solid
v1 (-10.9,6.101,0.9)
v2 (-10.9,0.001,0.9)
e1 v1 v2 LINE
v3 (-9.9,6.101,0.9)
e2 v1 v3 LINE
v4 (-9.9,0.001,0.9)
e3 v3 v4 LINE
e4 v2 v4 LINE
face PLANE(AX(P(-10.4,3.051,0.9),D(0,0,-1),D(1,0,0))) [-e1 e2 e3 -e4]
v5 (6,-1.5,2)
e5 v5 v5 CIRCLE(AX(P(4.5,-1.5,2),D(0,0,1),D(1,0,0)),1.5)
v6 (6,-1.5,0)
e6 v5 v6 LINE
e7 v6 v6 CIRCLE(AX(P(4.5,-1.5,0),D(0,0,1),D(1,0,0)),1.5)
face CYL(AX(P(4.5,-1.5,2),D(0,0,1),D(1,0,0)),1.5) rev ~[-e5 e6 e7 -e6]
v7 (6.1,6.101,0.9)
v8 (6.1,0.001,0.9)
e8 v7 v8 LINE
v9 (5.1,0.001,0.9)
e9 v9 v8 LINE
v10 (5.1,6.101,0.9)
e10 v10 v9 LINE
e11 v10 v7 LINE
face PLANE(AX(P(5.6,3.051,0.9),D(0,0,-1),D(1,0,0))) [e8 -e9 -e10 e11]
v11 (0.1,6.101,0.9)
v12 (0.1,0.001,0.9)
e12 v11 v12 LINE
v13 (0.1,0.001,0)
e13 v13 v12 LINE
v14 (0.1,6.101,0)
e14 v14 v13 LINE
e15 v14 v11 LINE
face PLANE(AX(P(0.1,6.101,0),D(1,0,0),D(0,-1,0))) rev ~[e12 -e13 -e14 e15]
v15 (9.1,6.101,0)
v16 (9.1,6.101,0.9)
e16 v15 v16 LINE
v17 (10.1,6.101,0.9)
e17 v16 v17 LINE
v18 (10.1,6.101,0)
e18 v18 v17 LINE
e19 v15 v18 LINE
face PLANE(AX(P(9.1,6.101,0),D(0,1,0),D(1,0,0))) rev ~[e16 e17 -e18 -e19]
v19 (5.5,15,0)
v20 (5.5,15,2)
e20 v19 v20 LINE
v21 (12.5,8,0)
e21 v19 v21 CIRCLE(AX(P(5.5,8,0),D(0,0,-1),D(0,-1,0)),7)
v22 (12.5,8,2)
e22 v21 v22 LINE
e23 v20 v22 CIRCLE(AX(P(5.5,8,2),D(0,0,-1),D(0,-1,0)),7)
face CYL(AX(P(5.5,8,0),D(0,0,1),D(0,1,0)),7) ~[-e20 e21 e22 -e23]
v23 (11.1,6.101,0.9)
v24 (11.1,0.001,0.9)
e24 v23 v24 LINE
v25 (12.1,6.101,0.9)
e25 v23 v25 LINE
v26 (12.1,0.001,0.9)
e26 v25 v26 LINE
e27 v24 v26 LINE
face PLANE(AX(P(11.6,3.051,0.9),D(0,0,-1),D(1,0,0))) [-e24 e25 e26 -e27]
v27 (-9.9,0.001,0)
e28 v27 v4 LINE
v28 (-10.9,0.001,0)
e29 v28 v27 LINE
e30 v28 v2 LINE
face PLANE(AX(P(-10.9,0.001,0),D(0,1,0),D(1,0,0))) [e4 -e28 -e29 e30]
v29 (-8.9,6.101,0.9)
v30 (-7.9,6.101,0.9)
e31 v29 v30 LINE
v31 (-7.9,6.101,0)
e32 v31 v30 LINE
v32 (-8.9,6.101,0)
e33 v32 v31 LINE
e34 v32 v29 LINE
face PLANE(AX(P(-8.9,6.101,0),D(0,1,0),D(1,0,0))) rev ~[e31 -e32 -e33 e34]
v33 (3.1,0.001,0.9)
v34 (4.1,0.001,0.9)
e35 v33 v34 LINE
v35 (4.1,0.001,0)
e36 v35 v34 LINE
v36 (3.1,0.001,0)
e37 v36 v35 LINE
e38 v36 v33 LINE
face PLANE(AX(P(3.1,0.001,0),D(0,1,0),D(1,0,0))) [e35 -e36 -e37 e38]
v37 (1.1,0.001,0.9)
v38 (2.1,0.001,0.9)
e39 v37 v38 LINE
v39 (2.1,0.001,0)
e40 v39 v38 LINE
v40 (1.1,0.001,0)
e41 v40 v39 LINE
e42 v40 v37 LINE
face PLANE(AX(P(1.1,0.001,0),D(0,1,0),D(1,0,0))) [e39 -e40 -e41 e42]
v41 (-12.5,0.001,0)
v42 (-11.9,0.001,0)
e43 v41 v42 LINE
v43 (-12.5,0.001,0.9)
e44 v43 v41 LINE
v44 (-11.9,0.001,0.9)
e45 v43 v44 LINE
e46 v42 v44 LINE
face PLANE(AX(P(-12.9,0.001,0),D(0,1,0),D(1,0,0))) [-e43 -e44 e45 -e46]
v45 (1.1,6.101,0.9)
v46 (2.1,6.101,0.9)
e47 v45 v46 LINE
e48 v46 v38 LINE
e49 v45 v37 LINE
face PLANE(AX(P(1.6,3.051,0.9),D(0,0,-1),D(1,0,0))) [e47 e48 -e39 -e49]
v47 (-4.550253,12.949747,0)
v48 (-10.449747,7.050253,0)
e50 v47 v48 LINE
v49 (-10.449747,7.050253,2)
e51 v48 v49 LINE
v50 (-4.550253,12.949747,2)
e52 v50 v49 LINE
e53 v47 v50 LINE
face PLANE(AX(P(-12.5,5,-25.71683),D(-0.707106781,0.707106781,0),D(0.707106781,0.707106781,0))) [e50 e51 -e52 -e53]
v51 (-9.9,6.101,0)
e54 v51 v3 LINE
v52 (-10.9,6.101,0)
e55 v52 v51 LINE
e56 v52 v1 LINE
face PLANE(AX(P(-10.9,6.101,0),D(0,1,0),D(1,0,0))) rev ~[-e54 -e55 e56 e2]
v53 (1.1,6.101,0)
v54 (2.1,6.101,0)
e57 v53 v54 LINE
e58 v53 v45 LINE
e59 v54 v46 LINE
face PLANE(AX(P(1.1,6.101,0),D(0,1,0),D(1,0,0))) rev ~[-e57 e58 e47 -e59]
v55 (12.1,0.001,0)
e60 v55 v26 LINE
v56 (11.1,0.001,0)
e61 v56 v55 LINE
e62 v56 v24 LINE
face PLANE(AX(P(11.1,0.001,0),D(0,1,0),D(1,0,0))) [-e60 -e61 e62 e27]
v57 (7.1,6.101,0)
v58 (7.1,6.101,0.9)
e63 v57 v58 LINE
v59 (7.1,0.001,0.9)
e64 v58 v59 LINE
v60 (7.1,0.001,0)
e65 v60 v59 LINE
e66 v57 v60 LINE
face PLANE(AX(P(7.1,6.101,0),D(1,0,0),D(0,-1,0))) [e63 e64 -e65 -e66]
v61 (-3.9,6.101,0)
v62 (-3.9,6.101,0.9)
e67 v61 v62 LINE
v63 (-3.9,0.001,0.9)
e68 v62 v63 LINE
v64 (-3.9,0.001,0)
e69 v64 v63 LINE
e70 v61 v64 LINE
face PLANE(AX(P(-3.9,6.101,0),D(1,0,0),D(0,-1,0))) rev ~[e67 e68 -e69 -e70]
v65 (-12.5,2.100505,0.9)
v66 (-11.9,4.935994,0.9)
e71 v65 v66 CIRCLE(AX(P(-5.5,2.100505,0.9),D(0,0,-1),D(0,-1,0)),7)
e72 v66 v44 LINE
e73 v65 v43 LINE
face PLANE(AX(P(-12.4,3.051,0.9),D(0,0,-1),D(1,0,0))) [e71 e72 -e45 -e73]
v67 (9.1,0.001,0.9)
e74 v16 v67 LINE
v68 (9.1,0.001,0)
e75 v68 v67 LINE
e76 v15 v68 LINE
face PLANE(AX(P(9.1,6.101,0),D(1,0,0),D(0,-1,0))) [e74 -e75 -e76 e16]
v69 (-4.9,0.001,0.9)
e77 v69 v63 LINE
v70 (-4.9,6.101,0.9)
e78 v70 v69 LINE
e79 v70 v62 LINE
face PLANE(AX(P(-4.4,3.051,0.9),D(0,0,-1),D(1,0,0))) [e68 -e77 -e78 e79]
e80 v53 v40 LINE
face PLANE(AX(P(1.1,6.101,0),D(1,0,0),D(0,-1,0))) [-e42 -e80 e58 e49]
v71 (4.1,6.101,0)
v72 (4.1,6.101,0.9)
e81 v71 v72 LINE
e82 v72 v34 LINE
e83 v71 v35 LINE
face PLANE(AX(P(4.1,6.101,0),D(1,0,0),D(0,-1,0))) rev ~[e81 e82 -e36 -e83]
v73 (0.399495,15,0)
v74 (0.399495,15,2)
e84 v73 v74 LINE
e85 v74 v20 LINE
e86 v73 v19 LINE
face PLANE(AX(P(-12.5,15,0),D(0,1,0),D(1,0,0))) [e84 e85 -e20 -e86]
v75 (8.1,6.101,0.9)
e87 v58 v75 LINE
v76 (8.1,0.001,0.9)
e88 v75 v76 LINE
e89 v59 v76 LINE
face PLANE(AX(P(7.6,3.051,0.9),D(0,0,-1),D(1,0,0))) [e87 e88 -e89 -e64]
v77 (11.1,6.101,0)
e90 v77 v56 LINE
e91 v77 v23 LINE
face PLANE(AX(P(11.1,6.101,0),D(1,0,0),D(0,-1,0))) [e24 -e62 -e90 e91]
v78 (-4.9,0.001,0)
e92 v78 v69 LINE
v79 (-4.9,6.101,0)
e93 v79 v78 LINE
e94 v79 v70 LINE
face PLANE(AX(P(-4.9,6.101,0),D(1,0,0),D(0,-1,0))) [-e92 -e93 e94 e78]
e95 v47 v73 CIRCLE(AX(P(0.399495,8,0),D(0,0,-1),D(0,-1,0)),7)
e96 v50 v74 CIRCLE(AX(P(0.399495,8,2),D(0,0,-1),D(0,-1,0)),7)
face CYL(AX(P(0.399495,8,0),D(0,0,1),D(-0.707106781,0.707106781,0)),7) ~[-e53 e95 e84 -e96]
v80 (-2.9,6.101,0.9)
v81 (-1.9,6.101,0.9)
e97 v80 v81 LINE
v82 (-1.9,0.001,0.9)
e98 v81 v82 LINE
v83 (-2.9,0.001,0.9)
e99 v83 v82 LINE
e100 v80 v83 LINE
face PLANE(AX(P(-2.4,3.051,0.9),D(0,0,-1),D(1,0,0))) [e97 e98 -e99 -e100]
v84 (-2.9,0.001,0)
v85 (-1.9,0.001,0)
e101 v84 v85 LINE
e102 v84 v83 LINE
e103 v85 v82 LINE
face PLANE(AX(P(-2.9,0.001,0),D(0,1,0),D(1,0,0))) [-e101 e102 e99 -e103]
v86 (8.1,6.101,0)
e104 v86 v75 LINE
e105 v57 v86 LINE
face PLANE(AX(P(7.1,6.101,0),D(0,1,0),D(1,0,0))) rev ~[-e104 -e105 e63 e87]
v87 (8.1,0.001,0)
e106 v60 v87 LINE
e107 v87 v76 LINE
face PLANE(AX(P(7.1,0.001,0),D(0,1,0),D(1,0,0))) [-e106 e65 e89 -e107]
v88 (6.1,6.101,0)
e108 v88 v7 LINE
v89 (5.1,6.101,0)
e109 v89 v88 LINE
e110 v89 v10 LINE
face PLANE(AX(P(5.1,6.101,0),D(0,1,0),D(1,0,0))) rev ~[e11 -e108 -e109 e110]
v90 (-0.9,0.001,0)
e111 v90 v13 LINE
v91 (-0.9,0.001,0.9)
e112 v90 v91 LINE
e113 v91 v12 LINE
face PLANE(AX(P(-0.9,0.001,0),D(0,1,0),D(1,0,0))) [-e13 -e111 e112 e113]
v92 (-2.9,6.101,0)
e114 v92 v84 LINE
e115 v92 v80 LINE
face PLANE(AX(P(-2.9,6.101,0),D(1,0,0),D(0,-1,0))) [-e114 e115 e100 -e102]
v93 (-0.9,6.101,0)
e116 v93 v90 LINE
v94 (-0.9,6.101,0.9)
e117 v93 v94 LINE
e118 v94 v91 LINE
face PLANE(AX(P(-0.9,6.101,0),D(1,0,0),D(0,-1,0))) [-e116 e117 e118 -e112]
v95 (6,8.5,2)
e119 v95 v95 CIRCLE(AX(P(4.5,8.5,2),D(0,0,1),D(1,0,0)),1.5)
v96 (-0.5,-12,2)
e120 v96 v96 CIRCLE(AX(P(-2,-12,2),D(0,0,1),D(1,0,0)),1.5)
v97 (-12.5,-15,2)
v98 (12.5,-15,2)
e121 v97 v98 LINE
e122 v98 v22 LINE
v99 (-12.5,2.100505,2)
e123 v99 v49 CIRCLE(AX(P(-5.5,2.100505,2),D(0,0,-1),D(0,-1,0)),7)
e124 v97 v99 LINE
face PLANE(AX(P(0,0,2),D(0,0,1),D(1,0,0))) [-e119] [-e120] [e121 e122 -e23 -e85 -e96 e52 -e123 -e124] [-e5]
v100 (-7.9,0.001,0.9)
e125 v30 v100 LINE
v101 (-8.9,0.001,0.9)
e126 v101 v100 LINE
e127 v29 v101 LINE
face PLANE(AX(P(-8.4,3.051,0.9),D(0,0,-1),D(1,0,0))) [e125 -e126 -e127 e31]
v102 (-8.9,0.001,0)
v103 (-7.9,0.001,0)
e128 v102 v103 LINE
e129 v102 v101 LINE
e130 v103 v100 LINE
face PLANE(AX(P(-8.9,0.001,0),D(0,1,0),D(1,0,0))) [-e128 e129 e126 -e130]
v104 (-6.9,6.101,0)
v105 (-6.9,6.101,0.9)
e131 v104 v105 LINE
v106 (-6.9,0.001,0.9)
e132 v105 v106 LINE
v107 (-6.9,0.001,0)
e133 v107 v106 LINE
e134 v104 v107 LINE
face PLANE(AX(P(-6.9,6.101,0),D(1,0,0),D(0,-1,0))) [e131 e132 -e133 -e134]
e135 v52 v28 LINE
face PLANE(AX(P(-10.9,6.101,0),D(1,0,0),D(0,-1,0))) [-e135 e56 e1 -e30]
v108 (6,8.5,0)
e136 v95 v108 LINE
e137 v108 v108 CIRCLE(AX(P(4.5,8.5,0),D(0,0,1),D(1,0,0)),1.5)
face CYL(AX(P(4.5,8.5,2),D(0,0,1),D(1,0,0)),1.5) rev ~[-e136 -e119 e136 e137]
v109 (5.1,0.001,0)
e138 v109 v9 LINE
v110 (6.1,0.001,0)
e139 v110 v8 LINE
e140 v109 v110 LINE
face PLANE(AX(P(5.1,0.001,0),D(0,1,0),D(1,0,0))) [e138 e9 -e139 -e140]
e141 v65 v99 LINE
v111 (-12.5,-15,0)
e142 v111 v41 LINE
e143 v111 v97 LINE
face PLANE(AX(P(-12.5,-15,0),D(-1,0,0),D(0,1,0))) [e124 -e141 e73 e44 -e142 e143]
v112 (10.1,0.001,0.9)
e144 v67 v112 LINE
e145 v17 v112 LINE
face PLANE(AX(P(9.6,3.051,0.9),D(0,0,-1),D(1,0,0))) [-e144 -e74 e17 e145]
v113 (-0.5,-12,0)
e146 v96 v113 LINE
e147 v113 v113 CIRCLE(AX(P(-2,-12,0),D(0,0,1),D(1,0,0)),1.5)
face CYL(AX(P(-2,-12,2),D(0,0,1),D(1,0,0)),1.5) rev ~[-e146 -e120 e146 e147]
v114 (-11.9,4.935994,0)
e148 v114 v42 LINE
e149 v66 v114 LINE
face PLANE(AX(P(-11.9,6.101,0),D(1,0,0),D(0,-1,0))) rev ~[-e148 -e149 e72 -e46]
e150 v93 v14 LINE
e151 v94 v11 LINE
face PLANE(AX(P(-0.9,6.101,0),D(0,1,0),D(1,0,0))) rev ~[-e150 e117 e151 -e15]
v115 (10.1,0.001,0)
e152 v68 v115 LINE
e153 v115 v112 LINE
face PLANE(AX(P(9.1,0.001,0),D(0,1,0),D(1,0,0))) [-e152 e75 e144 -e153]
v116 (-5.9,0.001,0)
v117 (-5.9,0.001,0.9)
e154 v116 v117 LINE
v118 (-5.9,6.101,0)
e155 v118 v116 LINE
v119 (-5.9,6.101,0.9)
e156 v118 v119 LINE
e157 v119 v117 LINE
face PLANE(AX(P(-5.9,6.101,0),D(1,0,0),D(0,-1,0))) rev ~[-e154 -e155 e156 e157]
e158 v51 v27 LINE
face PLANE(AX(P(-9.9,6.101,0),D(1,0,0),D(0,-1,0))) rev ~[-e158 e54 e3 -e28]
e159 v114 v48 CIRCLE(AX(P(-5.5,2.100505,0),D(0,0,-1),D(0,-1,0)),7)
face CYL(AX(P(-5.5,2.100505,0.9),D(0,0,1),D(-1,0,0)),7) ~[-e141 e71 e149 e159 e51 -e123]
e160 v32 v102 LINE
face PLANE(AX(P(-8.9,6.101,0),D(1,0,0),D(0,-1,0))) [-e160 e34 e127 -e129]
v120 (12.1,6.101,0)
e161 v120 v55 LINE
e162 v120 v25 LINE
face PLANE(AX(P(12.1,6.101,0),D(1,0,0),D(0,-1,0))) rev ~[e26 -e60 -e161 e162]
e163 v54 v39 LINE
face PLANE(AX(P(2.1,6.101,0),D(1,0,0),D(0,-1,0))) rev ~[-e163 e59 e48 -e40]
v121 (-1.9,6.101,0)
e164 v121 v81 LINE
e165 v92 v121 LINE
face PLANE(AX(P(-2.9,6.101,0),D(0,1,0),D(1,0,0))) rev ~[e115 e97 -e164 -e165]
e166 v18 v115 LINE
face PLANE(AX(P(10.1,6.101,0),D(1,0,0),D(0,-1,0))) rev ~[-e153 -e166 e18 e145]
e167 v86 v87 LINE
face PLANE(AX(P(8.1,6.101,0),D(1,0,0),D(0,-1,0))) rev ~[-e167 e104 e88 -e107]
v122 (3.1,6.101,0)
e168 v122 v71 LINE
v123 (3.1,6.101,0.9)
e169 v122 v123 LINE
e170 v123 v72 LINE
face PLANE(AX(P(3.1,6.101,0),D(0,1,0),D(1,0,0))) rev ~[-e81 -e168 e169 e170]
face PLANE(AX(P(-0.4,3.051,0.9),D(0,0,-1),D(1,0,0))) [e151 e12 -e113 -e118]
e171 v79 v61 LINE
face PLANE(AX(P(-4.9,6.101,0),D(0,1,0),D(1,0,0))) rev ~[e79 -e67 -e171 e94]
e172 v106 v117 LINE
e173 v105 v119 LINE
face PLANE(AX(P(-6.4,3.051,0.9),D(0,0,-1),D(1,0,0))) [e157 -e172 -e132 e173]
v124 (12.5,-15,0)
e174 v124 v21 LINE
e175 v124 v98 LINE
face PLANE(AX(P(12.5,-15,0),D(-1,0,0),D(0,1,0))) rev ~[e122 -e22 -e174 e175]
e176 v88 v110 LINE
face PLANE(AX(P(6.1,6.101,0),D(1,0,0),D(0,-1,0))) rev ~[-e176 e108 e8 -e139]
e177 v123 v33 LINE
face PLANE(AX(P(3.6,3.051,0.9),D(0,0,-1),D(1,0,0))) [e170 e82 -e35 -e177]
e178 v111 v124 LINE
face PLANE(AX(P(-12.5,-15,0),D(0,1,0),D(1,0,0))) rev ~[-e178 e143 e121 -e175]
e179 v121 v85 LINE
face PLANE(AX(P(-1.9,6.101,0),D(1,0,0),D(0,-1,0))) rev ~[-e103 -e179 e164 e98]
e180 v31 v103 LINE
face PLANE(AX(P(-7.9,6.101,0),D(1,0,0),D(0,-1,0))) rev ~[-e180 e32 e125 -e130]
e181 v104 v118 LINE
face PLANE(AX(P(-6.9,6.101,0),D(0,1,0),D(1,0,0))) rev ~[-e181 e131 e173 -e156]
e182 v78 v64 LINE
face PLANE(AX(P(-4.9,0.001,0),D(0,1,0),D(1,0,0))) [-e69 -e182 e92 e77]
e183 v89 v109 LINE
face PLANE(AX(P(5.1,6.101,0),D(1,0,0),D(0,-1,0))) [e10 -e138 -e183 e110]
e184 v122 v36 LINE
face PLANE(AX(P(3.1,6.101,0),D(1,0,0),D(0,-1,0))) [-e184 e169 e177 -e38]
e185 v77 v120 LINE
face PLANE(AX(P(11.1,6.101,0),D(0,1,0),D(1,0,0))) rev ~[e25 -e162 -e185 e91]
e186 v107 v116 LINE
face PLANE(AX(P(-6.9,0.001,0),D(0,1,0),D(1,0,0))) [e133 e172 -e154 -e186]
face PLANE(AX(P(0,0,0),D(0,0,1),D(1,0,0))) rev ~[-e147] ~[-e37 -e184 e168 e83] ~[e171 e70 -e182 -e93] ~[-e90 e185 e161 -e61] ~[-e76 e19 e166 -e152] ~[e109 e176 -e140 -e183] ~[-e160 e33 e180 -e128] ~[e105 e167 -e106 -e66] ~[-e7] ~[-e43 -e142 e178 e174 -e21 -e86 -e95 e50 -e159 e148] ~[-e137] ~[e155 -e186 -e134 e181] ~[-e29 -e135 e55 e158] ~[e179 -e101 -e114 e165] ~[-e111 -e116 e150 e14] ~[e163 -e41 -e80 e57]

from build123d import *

# Parameters (mm, degrees)
F0_W        = 25
F0_H        = 30
F1_DEPTH    = 2
F2_R        = 1.5
F3_DEPTH    = 2.001
F4_W        = 1
F4_H        = 6.1
F5_DEPTH    = 0.9
F6_T1_DEPTH = 53.4336597593
F7_R        = 7


# Not quite as in the source:
# - a fillet or chamfer that OpenCascade refuses, or shapes differently, is made with other operations: its cross-section is extruded or revolved along the edge and cut away or added


with BuildPart() as f1:
    # F0 (on Top) → F1 (new body)
    with BuildSketch(Plane.XY):
        Rectangle(F0_W, F0_H)
    extrude(amount=F1_DEPTH)

    # F2 (on face) → F3 (cut, through all)
    with BuildSketch(Plane.XY.offset(2)):
        with Locations((-2, -12)):
            Circle(F2_R)
        with Locations((4.5, -1.5)):
            Circle(F2_R)
        with Locations((4.5, 8.5)):
            Circle(F2_R)
    extrude(amount=-F3_DEPTH, mode=Mode.SUBTRACT)

    # F4 (on face) → F5 (cut)
    with BuildSketch(Plane(origin=(0, 0, 0), x_dir=(1, 0, 0), z_dir=(0, 0, -1))):
        with Locations((11.6, -3.051)):
            Rectangle(F4_W, F4_H)
        with Locations((9.6, -3.051)):
            Rectangle(F4_W, F4_H)
        with Locations((7.6, -3.051)):
            Rectangle(F4_W, F4_H)
        with Locations((5.6, -3.051)):
            Rectangle(F4_W, F4_H)
        with Locations((3.6, -3.051)):
            Rectangle(F4_W, F4_H)
        with Locations((1.6, -3.051)):
            Rectangle(F4_W, F4_H)
        with Locations((-0.4, -3.051)):
            Rectangle(F4_W, F4_H)
        with Locations((-2.4, -3.051)):
            Rectangle(F4_W, F4_H)
        with Locations((-4.4, -3.051)):
            Rectangle(F4_W, F4_H)
        with Locations((-6.4, -3.051)):
            Rectangle(F4_W, F4_H)
        with Locations((-8.4, -3.051)):
            Rectangle(F4_W, F4_H)
        with Locations((-10.4, -3.051)):
            Rectangle(F4_W, F4_H)
        with Locations((-12.4, -3.051)):
            Rectangle(F4_W, F4_H)
    extrude(amount=-F5_DEPTH, mode=Mode.SUBTRACT)

    # F6: chamfer of 10 on 1 edges, made by hand

    # F6_s2 → F6_t1 (cut)
    with BuildSketch(Plane.XY.offset(-25.7168298797)):
        Polygon((-12.5, 5), (-2.5, 15), (-12.5, 15), align=None)
    extrude(amount=F6_T1_DEPTH, mode=Mode.SUBTRACT)

    # F7
    f7_edges = [f1.edges().sort_by_distance(p)[0] for p in [
        (-12.5, 5, 1.45),
        (-2.5, 15, 1),
        (12.5, 15, 1),
    ]]
    fillet(f7_edges, radius=F7_R)


solid = f1.part
